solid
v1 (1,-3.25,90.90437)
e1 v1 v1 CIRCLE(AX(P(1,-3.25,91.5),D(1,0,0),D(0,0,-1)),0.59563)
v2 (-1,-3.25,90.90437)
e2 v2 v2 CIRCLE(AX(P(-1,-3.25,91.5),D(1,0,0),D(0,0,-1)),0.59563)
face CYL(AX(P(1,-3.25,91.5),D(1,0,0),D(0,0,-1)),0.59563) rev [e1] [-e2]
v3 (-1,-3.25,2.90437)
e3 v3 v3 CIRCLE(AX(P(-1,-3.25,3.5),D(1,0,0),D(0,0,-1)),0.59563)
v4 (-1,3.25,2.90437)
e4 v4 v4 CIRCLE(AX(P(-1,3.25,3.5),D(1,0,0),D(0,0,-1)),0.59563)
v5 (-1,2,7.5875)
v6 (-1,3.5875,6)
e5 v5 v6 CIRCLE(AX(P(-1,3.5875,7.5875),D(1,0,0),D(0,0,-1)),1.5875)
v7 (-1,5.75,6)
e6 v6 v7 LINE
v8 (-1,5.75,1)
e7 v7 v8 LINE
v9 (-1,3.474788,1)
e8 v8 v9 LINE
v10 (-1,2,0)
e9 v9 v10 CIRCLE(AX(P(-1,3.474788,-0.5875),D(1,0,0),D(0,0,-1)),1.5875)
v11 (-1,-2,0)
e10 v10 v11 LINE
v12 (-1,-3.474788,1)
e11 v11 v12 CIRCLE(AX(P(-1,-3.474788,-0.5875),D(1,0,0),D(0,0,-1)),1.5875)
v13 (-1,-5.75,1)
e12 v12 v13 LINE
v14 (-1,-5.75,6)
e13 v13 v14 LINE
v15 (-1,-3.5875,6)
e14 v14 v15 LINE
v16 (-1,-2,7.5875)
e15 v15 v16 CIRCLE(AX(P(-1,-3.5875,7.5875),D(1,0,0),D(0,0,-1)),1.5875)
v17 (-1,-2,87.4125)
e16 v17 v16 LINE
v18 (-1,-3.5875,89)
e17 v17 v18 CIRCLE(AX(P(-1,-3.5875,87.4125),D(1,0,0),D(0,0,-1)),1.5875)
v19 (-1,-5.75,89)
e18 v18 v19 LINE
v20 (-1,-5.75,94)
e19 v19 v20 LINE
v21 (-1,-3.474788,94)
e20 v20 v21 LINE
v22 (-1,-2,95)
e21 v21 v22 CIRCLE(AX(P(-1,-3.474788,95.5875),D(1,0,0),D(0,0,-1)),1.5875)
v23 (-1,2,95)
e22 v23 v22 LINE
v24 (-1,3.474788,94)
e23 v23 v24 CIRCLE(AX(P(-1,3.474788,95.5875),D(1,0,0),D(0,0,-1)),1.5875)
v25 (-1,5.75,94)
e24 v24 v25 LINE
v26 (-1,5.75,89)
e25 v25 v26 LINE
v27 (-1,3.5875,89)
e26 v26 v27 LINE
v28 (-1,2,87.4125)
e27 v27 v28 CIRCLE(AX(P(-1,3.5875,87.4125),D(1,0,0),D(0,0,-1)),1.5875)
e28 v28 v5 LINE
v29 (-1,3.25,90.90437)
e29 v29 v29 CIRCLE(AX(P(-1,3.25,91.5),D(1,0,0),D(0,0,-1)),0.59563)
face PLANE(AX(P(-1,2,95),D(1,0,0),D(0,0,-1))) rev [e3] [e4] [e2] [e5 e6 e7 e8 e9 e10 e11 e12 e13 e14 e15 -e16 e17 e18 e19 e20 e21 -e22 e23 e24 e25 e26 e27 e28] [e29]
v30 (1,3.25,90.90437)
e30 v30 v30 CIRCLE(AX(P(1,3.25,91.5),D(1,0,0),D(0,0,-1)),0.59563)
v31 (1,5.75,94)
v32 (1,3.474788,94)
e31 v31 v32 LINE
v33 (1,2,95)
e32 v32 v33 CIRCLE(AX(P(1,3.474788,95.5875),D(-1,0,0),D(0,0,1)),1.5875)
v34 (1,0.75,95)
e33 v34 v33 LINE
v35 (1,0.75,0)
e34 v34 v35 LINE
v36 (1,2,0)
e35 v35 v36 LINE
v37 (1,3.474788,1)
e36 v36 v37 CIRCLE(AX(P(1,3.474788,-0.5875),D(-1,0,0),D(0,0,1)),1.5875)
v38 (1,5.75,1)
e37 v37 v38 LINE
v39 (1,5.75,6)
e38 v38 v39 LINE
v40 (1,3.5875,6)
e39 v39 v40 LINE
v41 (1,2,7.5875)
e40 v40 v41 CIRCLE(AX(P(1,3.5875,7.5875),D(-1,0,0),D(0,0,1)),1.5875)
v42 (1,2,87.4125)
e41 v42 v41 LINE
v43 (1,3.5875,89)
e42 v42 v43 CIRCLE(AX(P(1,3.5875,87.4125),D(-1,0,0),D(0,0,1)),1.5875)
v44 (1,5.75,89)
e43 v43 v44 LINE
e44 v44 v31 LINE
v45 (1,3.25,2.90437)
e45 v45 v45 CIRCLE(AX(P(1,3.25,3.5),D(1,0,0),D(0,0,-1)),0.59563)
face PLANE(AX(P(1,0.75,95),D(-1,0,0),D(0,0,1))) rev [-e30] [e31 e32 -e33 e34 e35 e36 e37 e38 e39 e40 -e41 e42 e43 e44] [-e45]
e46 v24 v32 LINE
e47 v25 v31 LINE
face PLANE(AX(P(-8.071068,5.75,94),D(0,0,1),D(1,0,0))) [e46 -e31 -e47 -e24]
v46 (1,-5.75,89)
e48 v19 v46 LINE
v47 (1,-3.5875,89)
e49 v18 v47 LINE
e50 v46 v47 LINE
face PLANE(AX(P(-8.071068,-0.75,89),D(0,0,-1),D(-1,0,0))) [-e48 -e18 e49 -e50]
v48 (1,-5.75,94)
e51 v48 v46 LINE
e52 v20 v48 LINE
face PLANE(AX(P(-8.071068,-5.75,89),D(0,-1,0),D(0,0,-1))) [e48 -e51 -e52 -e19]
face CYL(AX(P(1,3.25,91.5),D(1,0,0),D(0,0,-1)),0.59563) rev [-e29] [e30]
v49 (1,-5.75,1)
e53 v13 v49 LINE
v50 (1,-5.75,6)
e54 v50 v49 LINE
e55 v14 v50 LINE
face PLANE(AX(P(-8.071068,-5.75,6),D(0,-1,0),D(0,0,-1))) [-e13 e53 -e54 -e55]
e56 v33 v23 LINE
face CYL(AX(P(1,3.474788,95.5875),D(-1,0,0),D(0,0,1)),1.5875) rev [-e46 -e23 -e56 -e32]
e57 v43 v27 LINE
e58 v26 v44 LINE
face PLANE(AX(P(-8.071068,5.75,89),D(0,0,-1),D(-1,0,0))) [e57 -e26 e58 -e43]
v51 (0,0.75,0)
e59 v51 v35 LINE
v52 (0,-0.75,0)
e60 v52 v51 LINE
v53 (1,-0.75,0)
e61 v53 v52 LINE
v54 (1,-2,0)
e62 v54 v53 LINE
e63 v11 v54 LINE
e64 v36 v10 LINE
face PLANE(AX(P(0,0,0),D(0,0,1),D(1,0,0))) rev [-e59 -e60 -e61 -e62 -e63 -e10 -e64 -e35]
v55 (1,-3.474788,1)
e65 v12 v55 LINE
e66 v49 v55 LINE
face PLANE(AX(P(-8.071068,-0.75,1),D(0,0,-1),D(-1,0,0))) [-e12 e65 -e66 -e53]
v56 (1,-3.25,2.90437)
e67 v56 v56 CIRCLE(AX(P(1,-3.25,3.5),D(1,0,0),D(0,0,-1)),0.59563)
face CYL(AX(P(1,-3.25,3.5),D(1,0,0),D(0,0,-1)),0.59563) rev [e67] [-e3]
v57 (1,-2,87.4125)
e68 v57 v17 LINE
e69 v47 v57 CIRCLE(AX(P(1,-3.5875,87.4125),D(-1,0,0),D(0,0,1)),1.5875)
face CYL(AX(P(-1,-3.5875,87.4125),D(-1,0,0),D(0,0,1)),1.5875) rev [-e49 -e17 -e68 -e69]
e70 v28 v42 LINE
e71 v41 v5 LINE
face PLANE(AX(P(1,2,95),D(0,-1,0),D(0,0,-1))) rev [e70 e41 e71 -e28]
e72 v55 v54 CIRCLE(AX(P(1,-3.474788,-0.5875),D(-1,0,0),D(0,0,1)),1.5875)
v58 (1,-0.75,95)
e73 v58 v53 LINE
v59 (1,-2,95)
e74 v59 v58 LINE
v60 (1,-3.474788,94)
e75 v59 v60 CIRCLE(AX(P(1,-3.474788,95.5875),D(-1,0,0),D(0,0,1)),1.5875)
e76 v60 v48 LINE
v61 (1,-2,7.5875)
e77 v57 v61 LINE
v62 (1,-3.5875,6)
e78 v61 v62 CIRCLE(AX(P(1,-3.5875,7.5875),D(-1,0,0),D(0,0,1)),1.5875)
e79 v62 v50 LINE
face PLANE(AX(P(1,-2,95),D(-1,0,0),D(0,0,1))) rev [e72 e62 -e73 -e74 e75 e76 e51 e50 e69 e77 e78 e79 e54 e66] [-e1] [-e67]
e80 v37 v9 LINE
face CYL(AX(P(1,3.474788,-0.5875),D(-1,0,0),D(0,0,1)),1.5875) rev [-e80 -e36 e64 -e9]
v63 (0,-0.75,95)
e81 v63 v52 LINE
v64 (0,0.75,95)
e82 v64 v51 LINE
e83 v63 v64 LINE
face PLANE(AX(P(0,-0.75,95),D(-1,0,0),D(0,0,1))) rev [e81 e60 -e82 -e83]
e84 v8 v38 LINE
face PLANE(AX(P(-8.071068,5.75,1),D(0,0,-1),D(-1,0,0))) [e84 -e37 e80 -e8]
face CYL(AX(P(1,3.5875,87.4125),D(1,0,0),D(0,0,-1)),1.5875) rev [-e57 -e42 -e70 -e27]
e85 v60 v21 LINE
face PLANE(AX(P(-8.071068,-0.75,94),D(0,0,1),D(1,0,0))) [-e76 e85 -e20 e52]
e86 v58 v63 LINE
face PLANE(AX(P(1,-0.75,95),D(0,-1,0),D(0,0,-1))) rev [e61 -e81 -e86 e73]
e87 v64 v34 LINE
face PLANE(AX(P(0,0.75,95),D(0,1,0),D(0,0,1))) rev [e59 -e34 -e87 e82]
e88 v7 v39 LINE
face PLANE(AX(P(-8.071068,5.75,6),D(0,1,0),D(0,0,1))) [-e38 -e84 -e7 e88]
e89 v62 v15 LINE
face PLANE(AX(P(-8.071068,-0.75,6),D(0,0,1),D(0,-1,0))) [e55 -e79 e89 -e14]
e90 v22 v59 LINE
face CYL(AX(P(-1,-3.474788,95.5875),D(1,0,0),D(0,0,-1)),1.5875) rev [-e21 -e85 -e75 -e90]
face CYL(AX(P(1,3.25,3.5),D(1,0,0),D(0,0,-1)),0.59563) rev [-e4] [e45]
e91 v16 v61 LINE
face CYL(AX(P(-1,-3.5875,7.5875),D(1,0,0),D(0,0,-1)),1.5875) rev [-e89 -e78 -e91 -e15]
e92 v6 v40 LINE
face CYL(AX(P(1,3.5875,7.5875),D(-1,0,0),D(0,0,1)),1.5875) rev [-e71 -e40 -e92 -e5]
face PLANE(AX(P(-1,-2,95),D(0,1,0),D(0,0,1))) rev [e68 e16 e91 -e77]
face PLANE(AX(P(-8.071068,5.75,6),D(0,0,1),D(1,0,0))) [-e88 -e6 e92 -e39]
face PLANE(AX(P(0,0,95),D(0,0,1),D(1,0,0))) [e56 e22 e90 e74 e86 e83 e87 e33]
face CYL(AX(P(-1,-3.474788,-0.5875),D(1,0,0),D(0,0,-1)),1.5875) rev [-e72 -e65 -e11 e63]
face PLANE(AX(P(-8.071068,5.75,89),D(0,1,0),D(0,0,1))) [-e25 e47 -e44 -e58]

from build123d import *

# Parameters (mm, degrees)
BOSS_EXTRUDE1_DEPTH       = 95
SKETCH4_W                 = 5
SKETCH4_H                 = 5
BOSS_EXTRUDE4_DEPTH       = 2
FILLET1_R                 = 1.5875
F_0_80_TAPPED_HOLE1_D     = 1.19126
F_0_80_TAPPED_HOLE1_DEPTH = 4.0005
F_0_80_TAPPED_HOLE1_TIP   = 0.357890611


with BuildPart() as part:
    # Sketch1 → Boss-Extrude1 (new body)
    with BuildSketch(Plane.XY):
        Polygon((-1, 2), (-1, -2), (1, -2), (1, -0.75), (0, -0.75), (0, 0.75), (1, 0.75), (1, 2), align=None)
    extrude(amount=BOSS_EXTRUDE1_DEPTH)

    # Sketch4 → Boss-Extrude4 (add)
    with BuildSketch(Plane(origin=(1, 0, 0), x_dir=(0, 0, -1), z_dir=(1, 0, 0))):
        with Locations((-91.5, 3.25)):
            Rectangle(SKETCH4_W, SKETCH4_H)
        with Locations((-91.5, -3.25)):
            Rectangle(SKETCH4_W, SKETCH4_H)
        with Locations((-3.5, 3.25)):
            Rectangle(SKETCH4_W, SKETCH4_H)
        with Locations((-3.5, -3.25)):
            Rectangle(SKETCH4_W, SKETCH4_H)
    extrude(amount=-BOSS_EXTRUDE4_DEPTH)

    # Fillet1
    # the kernel refuses this fillet: 1.5875 mm, written as the material it adds along each edge
    with BuildSketch(Plane(origin=(1, 2, 94), x_dir=(0, 0, 1), z_dir=(-1, 0, 0))) as fillet1_piece_1:
        with BuildLine():
            CenterArc((1.5875, 1.47478812), FILLET1_R, 180, 68.279526527)
            Line((0, 1.47478812), (-0.03175, 1.47478812))
            Line((-0.03175, 1.47478812), (-0.03175, 0))
            Line((-0.03175, 0), (0, -0.03175))
            ThreePointArc((0, -0.03175), (0.5, -0.03175), (0.98825, -0.029495762))
            Line((0.98825, -0.029495762), (1, 0))
        make_face()
    extrude(amount=2)
    with BuildSketch(Plane(origin=(-1, 2, 89), x_dir=(0, 1, 0), z_dir=(1, 0, 0)), Plane(origin=(-1, 2, 6), x_dir=(0, 0, 1), z_dir=(1, 0, 0))) as fillet1_piece_2:
        with BuildLine():
            CenterArc((FILLET1_R, -FILLET1_R), FILLET1_R, 90, 90)
            Line((0, -FILLET1_R), (-FILLET1_R * 0.02, -FILLET1_R))
            Line((-FILLET1_R * 0.02, -FILLET1_R), (-FILLET1_R * 0.02, FILLET1_R * 0.02))
            Line((-FILLET1_R * 0.02, FILLET1_R * 0.02), (FILLET1_R, FILLET1_R * 0.02))
            Line((FILLET1_R, FILLET1_R * 0.02), (FILLET1_R, 0))
        make_face()
    extrude(amount=2)
    with BuildSketch(Plane(origin=(1, 2, 1), x_dir=(0, 1, 0), z_dir=(-1, 0, 0))) as fillet1_piece_3:
        with BuildLine():
            CenterArc((1.47478812, 1.5875), FILLET1_R, 201.720473473, 68.279526527)
            Line((0, 1), (-0.029495762, 0.98825))
            ThreePointArc((-0.029495762, 0.98825), (-0.03175, 0.5), (-0.03175, 0))
            Line((-0.03175, 0), (0, -0.03175))
            Line((0, -0.03175), (1.47478812, -0.03175))
            Line((1.47478812, -0.03175), (1.47478812, 0))
        make_face()
    extrude(amount=2)
    with BuildSketch(Plane(origin=(1, -2, 6), x_dir=(0, -1, 0), z_dir=(-1, 0, 0)), Plane(origin=(1, -2, 89), x_dir=(0, 0, -1), z_dir=(-1, 0, 0))) as fillet1_piece_4:
        with BuildLine():
            CenterArc((FILLET1_R, FILLET1_R), FILLET1_R, 180, 90)
            Line((0, FILLET1_R), (-FILLET1_R * 0.02, FILLET1_R))
            Line((-FILLET1_R * 0.02, FILLET1_R), (-FILLET1_R * 0.02, -FILLET1_R * 0.02))
            Line((-FILLET1_R * 0.02, -FILLET1_R * 0.02), (FILLET1_R, -FILLET1_R * 0.02))
            Line((FILLET1_R, -FILLET1_R * 0.02), (FILLET1_R, 0))
        make_face()
    extrude(amount=2)
    with BuildSketch(Plane(origin=(-1, -2, 1), x_dir=(0, 0, -1), z_dir=(1, 0, 0))) as fillet1_piece_5:
        with BuildLine():
            CenterArc((1.5875, -1.47478812), FILLET1_R, 111.720473473, 68.279526527)
            Line((0, -1.47478812), (-0.03175, -1.47478812))
            Line((-0.03175, -1.47478812), (-0.03175, 0))
            Line((-0.03175, 0), (0, 0.03175))
            ThreePointArc((0, 0.03175), (0.5, 0.03175), (0.98825, 0.029495762))
            Line((0.98825, 0.029495762), (1, 0))
        make_face()
    extrude(amount=2)
    with BuildSketch(Plane(origin=(-1, -2, 94), x_dir=(0, -1, 0), z_dir=(1, 0, 0))) as fillet1_piece_6:
        with BuildLine():
            CenterArc((1.47478812, -1.5875), FILLET1_R, 90, 68.279526527)
            Line((0, -1), (-0.029495762, -0.98825))
            ThreePointArc((-0.029495762, -0.98825), (-0.03175, -0.5), (-0.03175, 0))
            Line((-0.03175, 0), (0, 0.03175))
            Line((0, 0.03175), (1.47478812, 0.03175))
            Line((1.47478812, 0.03175), (1.47478812, 0))
        make_face()
    extrude(amount=2)

    # #0-80 Tapped Hole1
    with Locations(Plane(origin=(1, 0, 0), x_dir=(0, 0, -1), z_dir=(1, 0, 0))):
        with Locations((-91.5, 3.25), (-3.5, -3.25), (-91.5, -3.25), (-3.5, 3.25)):
            Hole(F_0_80_TAPPED_HOLE1_D / 2, depth=F_0_80_TAPPED_HOLE1_DEPTH)
            with Locations((0, 0, -(F_0_80_TAPPED_HOLE1_DEPTH + F_0_80_TAPPED_HOLE1_TIP / 2))):  # 118° drill point
                Cone(0, F_0_80_TAPPED_HOLE1_D / 2, F_0_80_TAPPED_HOLE1_TIP, mode=Mode.SUBTRACT)


solid = part.part
